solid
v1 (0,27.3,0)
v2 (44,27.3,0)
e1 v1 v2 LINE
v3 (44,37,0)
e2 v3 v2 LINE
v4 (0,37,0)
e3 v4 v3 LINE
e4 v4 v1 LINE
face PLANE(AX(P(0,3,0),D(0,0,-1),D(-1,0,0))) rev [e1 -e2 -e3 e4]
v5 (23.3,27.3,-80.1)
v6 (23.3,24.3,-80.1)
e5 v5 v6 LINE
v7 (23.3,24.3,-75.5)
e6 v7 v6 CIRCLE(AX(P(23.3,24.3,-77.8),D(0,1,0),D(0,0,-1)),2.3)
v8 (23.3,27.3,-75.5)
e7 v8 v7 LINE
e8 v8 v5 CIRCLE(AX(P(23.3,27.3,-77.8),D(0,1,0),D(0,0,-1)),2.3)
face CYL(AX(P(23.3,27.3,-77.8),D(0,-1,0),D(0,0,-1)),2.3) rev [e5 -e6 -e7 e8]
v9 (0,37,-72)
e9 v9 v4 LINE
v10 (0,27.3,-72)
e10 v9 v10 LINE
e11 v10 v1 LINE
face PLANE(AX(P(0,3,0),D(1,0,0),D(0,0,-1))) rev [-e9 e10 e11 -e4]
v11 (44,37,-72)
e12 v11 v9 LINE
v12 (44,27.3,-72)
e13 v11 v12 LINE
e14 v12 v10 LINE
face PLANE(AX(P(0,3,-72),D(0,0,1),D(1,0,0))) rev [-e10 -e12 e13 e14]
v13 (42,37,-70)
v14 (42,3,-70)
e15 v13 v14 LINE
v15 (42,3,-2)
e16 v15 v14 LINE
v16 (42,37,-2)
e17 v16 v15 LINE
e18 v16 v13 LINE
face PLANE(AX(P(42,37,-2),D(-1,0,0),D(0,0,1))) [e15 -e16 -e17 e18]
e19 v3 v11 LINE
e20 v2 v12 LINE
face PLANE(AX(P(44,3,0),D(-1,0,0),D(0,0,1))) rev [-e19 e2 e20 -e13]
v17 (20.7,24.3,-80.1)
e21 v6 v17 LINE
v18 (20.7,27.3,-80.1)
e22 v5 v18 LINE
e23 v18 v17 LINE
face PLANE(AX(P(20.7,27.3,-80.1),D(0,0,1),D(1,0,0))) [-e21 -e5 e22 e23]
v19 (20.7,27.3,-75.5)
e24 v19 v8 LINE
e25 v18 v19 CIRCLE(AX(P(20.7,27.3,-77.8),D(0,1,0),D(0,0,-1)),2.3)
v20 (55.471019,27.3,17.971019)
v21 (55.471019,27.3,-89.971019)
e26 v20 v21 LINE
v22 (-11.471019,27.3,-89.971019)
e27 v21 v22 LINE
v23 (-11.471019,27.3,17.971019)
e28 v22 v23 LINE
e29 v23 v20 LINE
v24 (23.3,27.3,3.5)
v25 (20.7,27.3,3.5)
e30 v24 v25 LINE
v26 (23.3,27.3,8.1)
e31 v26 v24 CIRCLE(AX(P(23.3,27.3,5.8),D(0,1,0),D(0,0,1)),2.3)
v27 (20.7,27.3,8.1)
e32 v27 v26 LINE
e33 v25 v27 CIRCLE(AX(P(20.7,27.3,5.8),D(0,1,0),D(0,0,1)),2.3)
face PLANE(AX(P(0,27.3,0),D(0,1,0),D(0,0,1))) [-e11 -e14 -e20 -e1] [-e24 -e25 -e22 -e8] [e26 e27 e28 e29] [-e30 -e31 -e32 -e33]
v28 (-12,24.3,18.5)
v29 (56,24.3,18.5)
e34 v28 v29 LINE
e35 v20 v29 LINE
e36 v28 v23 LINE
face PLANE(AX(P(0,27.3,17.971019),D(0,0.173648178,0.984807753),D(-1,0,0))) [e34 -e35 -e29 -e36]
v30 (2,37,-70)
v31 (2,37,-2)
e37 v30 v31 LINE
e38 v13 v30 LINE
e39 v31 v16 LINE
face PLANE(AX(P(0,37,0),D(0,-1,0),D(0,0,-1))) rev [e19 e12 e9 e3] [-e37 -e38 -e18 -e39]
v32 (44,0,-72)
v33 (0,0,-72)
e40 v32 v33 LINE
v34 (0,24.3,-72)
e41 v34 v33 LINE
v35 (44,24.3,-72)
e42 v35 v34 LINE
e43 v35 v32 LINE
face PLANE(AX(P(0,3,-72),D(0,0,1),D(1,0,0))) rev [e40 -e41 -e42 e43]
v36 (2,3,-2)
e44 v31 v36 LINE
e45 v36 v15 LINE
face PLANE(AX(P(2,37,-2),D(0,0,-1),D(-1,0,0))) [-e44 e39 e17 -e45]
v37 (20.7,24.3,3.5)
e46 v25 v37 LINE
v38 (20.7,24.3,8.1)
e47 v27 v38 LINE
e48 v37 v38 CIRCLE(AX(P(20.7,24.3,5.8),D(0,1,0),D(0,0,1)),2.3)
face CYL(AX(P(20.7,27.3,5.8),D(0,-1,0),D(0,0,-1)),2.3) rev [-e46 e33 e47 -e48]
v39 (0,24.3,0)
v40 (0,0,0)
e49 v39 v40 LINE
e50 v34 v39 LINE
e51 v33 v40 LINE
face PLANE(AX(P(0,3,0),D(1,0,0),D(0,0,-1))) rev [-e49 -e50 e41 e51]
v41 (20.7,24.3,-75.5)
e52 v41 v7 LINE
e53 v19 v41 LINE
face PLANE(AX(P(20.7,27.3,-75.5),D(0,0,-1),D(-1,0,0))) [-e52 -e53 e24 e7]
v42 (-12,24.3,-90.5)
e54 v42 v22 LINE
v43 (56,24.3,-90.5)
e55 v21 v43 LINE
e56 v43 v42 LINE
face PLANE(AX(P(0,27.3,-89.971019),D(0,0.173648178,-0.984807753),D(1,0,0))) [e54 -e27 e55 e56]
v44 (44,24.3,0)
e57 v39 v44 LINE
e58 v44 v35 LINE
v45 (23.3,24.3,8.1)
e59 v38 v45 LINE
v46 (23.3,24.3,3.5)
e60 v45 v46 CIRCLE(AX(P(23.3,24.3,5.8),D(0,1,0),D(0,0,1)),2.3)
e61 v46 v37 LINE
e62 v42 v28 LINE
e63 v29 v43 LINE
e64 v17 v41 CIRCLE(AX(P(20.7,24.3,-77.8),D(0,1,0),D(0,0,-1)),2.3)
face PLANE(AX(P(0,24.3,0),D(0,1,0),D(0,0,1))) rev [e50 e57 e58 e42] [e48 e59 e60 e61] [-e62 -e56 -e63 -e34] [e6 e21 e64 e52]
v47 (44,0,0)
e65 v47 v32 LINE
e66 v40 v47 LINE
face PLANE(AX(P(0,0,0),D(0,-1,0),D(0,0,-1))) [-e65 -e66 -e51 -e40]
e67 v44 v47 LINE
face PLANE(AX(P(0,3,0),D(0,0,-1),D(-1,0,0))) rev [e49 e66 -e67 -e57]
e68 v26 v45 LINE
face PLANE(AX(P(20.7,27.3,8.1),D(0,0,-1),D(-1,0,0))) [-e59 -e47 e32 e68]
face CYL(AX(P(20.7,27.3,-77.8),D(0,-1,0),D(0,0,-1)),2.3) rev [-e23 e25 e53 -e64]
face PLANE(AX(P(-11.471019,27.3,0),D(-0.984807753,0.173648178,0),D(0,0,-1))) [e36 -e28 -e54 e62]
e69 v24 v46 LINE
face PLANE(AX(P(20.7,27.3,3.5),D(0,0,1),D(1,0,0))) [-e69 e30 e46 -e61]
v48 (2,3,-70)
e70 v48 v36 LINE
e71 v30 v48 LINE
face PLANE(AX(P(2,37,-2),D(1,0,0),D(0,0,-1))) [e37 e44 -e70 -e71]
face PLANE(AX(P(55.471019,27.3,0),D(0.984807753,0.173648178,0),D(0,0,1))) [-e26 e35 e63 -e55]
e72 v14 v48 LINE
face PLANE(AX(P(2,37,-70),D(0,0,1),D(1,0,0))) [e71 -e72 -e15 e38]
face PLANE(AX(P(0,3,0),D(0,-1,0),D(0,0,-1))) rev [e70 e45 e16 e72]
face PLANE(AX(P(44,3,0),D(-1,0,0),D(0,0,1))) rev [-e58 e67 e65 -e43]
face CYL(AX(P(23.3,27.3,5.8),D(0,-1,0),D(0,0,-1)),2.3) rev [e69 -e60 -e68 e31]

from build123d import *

# Parameters (mm, degrees)
SKETCH1_W           = 44
SKETCH1_H           = 72
BOSS_EXTRUDE1_DEPTH = 3
SKETCH2_W           = 44
SKETCH2_H           = 72
SKETCH2_W_2         = 40
SKETCH2_H_2         = 68
BOSS_EXTRUDE2_DEPTH = 34
SKETCH3_W           = 68
SKETCH3_H           = 109
SKETCH3_W_2         = 44
SKETCH3_H_2         = 72
BOSS_EXTRUDE3_DEPTH = 3
CHAMFER1_SIZE       = 0.528980942
CHAMFER1_SIZE_2     = 3


with BuildPart() as part:
    # Sketch1 → Boss-Extrude1 (new body)
    with BuildSketch(Plane(origin=(0, 0, 0), x_dir=(1, 0, 0), z_dir=(0, 1, 0))):
        with Locations((22, 36)):
            Rectangle(SKETCH1_W, SKETCH1_H)
    extrude(amount=BOSS_EXTRUDE1_DEPTH)

    # Sketch2 → Boss-Extrude2 (add)
    with BuildSketch(Plane(origin=(0, 3, 0), x_dir=(1, 0, 0), z_dir=(0, 1, 0))):
        with Locations((22, 36)):
            Rectangle(SKETCH2_W, SKETCH2_H)
        with Locations((22, 36)):
            Rectangle(SKETCH2_W_2, SKETCH2_H_2, mode=Mode.SUBTRACT)
    extrude(amount=BOSS_EXTRUDE2_DEPTH)

    # Sketch3 → Boss-Extrude3 (add)
    with BuildSketch(Plane(origin=(0, 24.3, 0), x_dir=(1, 0, 0), z_dir=(0, 1, 0))):
        with Locations((22, 36)):
            Rectangle(SKETCH3_W, SKETCH3_H)
        with Locations((22, 36)):
            Rectangle(SKETCH3_W_2, SKETCH3_H_2, mode=Mode.SUBTRACT)
        with BuildLine():
            Line((20.7, -3.5), (23.3, -3.5))
            ThreePointArc((23.3, -3.5), (25.6, -5.8), (23.3, -8.1))
            Line((23.3, -8.1), (20.7, -8.1))
            ThreePointArc((20.7, -8.1), (18.4, -5.8), (20.7, -3.5))
        make_face(mode=Mode.SUBTRACT)
        with BuildLine():
            Line((20.7, 75.5), (23.3, 75.5))
            ThreePointArc((23.3, 75.5), (25.6, 77.8), (23.3, 80.1))
            Line((23.3, 80.1), (20.7, 80.1))
            ThreePointArc((20.7, 80.1), (18.4, 77.8), (20.7, 75.5))
        make_face(mode=Mode.SUBTRACT)
    extrude(amount=BOSS_EXTRUDE3_DEPTH)

    # Chamfer1
    # the kernel refuses this chamfer: 3, 0.528980942 mm, written as the material it takes off along each edge
    with BuildSketch(Plane(origin=(-19.795616389, 27.3, -90.5), x_dir=(0, 0.21013876076743068, 0.9776715712462589), z_dir=(1, 0, 0)), Plane(origin=(63.795616389, 27.3, 18.5), x_dir=(0, 0.21013876076743068, -0.9776715712462589), z_dir=(-1, 0, 0))) as chamfer1_piece_1:
        Polygon((CHAMFER1_SIZE * 0.977671571478, CHAMFER1_SIZE * 0.210138760817), (-CHAMFER1_SIZE_2 * 0.210138760767, CHAMFER1_SIZE_2 * 0.977671571246), (0, 0), align=None)
    extrude(amount=83.591232779, mode=Mode.SUBTRACT)
    with BuildSketch(Plane(origin=(-12, 27.3, 26.295616389), x_dir=(0.9776715712462593, 0.21013876076742874, 0), z_dir=(0, 0, -1)), Plane(origin=(56, 27.3, -98.295616389), x_dir=(-0.9776715712462594, 0.21013876076742807, 0), z_dir=(0, 0, 1))) as chamfer1_piece_2:
        Polygon((CHAMFER1_SIZE * 0.977671571478, CHAMFER1_SIZE * 0.210138760817), (-CHAMFER1_SIZE_2 * 0.210138760767, CHAMFER1_SIZE_2 * 0.977671571246), (0, 0), align=None)
    extrude(amount=124.591232779, mode=Mode.SUBTRACT)


solid = part.part
